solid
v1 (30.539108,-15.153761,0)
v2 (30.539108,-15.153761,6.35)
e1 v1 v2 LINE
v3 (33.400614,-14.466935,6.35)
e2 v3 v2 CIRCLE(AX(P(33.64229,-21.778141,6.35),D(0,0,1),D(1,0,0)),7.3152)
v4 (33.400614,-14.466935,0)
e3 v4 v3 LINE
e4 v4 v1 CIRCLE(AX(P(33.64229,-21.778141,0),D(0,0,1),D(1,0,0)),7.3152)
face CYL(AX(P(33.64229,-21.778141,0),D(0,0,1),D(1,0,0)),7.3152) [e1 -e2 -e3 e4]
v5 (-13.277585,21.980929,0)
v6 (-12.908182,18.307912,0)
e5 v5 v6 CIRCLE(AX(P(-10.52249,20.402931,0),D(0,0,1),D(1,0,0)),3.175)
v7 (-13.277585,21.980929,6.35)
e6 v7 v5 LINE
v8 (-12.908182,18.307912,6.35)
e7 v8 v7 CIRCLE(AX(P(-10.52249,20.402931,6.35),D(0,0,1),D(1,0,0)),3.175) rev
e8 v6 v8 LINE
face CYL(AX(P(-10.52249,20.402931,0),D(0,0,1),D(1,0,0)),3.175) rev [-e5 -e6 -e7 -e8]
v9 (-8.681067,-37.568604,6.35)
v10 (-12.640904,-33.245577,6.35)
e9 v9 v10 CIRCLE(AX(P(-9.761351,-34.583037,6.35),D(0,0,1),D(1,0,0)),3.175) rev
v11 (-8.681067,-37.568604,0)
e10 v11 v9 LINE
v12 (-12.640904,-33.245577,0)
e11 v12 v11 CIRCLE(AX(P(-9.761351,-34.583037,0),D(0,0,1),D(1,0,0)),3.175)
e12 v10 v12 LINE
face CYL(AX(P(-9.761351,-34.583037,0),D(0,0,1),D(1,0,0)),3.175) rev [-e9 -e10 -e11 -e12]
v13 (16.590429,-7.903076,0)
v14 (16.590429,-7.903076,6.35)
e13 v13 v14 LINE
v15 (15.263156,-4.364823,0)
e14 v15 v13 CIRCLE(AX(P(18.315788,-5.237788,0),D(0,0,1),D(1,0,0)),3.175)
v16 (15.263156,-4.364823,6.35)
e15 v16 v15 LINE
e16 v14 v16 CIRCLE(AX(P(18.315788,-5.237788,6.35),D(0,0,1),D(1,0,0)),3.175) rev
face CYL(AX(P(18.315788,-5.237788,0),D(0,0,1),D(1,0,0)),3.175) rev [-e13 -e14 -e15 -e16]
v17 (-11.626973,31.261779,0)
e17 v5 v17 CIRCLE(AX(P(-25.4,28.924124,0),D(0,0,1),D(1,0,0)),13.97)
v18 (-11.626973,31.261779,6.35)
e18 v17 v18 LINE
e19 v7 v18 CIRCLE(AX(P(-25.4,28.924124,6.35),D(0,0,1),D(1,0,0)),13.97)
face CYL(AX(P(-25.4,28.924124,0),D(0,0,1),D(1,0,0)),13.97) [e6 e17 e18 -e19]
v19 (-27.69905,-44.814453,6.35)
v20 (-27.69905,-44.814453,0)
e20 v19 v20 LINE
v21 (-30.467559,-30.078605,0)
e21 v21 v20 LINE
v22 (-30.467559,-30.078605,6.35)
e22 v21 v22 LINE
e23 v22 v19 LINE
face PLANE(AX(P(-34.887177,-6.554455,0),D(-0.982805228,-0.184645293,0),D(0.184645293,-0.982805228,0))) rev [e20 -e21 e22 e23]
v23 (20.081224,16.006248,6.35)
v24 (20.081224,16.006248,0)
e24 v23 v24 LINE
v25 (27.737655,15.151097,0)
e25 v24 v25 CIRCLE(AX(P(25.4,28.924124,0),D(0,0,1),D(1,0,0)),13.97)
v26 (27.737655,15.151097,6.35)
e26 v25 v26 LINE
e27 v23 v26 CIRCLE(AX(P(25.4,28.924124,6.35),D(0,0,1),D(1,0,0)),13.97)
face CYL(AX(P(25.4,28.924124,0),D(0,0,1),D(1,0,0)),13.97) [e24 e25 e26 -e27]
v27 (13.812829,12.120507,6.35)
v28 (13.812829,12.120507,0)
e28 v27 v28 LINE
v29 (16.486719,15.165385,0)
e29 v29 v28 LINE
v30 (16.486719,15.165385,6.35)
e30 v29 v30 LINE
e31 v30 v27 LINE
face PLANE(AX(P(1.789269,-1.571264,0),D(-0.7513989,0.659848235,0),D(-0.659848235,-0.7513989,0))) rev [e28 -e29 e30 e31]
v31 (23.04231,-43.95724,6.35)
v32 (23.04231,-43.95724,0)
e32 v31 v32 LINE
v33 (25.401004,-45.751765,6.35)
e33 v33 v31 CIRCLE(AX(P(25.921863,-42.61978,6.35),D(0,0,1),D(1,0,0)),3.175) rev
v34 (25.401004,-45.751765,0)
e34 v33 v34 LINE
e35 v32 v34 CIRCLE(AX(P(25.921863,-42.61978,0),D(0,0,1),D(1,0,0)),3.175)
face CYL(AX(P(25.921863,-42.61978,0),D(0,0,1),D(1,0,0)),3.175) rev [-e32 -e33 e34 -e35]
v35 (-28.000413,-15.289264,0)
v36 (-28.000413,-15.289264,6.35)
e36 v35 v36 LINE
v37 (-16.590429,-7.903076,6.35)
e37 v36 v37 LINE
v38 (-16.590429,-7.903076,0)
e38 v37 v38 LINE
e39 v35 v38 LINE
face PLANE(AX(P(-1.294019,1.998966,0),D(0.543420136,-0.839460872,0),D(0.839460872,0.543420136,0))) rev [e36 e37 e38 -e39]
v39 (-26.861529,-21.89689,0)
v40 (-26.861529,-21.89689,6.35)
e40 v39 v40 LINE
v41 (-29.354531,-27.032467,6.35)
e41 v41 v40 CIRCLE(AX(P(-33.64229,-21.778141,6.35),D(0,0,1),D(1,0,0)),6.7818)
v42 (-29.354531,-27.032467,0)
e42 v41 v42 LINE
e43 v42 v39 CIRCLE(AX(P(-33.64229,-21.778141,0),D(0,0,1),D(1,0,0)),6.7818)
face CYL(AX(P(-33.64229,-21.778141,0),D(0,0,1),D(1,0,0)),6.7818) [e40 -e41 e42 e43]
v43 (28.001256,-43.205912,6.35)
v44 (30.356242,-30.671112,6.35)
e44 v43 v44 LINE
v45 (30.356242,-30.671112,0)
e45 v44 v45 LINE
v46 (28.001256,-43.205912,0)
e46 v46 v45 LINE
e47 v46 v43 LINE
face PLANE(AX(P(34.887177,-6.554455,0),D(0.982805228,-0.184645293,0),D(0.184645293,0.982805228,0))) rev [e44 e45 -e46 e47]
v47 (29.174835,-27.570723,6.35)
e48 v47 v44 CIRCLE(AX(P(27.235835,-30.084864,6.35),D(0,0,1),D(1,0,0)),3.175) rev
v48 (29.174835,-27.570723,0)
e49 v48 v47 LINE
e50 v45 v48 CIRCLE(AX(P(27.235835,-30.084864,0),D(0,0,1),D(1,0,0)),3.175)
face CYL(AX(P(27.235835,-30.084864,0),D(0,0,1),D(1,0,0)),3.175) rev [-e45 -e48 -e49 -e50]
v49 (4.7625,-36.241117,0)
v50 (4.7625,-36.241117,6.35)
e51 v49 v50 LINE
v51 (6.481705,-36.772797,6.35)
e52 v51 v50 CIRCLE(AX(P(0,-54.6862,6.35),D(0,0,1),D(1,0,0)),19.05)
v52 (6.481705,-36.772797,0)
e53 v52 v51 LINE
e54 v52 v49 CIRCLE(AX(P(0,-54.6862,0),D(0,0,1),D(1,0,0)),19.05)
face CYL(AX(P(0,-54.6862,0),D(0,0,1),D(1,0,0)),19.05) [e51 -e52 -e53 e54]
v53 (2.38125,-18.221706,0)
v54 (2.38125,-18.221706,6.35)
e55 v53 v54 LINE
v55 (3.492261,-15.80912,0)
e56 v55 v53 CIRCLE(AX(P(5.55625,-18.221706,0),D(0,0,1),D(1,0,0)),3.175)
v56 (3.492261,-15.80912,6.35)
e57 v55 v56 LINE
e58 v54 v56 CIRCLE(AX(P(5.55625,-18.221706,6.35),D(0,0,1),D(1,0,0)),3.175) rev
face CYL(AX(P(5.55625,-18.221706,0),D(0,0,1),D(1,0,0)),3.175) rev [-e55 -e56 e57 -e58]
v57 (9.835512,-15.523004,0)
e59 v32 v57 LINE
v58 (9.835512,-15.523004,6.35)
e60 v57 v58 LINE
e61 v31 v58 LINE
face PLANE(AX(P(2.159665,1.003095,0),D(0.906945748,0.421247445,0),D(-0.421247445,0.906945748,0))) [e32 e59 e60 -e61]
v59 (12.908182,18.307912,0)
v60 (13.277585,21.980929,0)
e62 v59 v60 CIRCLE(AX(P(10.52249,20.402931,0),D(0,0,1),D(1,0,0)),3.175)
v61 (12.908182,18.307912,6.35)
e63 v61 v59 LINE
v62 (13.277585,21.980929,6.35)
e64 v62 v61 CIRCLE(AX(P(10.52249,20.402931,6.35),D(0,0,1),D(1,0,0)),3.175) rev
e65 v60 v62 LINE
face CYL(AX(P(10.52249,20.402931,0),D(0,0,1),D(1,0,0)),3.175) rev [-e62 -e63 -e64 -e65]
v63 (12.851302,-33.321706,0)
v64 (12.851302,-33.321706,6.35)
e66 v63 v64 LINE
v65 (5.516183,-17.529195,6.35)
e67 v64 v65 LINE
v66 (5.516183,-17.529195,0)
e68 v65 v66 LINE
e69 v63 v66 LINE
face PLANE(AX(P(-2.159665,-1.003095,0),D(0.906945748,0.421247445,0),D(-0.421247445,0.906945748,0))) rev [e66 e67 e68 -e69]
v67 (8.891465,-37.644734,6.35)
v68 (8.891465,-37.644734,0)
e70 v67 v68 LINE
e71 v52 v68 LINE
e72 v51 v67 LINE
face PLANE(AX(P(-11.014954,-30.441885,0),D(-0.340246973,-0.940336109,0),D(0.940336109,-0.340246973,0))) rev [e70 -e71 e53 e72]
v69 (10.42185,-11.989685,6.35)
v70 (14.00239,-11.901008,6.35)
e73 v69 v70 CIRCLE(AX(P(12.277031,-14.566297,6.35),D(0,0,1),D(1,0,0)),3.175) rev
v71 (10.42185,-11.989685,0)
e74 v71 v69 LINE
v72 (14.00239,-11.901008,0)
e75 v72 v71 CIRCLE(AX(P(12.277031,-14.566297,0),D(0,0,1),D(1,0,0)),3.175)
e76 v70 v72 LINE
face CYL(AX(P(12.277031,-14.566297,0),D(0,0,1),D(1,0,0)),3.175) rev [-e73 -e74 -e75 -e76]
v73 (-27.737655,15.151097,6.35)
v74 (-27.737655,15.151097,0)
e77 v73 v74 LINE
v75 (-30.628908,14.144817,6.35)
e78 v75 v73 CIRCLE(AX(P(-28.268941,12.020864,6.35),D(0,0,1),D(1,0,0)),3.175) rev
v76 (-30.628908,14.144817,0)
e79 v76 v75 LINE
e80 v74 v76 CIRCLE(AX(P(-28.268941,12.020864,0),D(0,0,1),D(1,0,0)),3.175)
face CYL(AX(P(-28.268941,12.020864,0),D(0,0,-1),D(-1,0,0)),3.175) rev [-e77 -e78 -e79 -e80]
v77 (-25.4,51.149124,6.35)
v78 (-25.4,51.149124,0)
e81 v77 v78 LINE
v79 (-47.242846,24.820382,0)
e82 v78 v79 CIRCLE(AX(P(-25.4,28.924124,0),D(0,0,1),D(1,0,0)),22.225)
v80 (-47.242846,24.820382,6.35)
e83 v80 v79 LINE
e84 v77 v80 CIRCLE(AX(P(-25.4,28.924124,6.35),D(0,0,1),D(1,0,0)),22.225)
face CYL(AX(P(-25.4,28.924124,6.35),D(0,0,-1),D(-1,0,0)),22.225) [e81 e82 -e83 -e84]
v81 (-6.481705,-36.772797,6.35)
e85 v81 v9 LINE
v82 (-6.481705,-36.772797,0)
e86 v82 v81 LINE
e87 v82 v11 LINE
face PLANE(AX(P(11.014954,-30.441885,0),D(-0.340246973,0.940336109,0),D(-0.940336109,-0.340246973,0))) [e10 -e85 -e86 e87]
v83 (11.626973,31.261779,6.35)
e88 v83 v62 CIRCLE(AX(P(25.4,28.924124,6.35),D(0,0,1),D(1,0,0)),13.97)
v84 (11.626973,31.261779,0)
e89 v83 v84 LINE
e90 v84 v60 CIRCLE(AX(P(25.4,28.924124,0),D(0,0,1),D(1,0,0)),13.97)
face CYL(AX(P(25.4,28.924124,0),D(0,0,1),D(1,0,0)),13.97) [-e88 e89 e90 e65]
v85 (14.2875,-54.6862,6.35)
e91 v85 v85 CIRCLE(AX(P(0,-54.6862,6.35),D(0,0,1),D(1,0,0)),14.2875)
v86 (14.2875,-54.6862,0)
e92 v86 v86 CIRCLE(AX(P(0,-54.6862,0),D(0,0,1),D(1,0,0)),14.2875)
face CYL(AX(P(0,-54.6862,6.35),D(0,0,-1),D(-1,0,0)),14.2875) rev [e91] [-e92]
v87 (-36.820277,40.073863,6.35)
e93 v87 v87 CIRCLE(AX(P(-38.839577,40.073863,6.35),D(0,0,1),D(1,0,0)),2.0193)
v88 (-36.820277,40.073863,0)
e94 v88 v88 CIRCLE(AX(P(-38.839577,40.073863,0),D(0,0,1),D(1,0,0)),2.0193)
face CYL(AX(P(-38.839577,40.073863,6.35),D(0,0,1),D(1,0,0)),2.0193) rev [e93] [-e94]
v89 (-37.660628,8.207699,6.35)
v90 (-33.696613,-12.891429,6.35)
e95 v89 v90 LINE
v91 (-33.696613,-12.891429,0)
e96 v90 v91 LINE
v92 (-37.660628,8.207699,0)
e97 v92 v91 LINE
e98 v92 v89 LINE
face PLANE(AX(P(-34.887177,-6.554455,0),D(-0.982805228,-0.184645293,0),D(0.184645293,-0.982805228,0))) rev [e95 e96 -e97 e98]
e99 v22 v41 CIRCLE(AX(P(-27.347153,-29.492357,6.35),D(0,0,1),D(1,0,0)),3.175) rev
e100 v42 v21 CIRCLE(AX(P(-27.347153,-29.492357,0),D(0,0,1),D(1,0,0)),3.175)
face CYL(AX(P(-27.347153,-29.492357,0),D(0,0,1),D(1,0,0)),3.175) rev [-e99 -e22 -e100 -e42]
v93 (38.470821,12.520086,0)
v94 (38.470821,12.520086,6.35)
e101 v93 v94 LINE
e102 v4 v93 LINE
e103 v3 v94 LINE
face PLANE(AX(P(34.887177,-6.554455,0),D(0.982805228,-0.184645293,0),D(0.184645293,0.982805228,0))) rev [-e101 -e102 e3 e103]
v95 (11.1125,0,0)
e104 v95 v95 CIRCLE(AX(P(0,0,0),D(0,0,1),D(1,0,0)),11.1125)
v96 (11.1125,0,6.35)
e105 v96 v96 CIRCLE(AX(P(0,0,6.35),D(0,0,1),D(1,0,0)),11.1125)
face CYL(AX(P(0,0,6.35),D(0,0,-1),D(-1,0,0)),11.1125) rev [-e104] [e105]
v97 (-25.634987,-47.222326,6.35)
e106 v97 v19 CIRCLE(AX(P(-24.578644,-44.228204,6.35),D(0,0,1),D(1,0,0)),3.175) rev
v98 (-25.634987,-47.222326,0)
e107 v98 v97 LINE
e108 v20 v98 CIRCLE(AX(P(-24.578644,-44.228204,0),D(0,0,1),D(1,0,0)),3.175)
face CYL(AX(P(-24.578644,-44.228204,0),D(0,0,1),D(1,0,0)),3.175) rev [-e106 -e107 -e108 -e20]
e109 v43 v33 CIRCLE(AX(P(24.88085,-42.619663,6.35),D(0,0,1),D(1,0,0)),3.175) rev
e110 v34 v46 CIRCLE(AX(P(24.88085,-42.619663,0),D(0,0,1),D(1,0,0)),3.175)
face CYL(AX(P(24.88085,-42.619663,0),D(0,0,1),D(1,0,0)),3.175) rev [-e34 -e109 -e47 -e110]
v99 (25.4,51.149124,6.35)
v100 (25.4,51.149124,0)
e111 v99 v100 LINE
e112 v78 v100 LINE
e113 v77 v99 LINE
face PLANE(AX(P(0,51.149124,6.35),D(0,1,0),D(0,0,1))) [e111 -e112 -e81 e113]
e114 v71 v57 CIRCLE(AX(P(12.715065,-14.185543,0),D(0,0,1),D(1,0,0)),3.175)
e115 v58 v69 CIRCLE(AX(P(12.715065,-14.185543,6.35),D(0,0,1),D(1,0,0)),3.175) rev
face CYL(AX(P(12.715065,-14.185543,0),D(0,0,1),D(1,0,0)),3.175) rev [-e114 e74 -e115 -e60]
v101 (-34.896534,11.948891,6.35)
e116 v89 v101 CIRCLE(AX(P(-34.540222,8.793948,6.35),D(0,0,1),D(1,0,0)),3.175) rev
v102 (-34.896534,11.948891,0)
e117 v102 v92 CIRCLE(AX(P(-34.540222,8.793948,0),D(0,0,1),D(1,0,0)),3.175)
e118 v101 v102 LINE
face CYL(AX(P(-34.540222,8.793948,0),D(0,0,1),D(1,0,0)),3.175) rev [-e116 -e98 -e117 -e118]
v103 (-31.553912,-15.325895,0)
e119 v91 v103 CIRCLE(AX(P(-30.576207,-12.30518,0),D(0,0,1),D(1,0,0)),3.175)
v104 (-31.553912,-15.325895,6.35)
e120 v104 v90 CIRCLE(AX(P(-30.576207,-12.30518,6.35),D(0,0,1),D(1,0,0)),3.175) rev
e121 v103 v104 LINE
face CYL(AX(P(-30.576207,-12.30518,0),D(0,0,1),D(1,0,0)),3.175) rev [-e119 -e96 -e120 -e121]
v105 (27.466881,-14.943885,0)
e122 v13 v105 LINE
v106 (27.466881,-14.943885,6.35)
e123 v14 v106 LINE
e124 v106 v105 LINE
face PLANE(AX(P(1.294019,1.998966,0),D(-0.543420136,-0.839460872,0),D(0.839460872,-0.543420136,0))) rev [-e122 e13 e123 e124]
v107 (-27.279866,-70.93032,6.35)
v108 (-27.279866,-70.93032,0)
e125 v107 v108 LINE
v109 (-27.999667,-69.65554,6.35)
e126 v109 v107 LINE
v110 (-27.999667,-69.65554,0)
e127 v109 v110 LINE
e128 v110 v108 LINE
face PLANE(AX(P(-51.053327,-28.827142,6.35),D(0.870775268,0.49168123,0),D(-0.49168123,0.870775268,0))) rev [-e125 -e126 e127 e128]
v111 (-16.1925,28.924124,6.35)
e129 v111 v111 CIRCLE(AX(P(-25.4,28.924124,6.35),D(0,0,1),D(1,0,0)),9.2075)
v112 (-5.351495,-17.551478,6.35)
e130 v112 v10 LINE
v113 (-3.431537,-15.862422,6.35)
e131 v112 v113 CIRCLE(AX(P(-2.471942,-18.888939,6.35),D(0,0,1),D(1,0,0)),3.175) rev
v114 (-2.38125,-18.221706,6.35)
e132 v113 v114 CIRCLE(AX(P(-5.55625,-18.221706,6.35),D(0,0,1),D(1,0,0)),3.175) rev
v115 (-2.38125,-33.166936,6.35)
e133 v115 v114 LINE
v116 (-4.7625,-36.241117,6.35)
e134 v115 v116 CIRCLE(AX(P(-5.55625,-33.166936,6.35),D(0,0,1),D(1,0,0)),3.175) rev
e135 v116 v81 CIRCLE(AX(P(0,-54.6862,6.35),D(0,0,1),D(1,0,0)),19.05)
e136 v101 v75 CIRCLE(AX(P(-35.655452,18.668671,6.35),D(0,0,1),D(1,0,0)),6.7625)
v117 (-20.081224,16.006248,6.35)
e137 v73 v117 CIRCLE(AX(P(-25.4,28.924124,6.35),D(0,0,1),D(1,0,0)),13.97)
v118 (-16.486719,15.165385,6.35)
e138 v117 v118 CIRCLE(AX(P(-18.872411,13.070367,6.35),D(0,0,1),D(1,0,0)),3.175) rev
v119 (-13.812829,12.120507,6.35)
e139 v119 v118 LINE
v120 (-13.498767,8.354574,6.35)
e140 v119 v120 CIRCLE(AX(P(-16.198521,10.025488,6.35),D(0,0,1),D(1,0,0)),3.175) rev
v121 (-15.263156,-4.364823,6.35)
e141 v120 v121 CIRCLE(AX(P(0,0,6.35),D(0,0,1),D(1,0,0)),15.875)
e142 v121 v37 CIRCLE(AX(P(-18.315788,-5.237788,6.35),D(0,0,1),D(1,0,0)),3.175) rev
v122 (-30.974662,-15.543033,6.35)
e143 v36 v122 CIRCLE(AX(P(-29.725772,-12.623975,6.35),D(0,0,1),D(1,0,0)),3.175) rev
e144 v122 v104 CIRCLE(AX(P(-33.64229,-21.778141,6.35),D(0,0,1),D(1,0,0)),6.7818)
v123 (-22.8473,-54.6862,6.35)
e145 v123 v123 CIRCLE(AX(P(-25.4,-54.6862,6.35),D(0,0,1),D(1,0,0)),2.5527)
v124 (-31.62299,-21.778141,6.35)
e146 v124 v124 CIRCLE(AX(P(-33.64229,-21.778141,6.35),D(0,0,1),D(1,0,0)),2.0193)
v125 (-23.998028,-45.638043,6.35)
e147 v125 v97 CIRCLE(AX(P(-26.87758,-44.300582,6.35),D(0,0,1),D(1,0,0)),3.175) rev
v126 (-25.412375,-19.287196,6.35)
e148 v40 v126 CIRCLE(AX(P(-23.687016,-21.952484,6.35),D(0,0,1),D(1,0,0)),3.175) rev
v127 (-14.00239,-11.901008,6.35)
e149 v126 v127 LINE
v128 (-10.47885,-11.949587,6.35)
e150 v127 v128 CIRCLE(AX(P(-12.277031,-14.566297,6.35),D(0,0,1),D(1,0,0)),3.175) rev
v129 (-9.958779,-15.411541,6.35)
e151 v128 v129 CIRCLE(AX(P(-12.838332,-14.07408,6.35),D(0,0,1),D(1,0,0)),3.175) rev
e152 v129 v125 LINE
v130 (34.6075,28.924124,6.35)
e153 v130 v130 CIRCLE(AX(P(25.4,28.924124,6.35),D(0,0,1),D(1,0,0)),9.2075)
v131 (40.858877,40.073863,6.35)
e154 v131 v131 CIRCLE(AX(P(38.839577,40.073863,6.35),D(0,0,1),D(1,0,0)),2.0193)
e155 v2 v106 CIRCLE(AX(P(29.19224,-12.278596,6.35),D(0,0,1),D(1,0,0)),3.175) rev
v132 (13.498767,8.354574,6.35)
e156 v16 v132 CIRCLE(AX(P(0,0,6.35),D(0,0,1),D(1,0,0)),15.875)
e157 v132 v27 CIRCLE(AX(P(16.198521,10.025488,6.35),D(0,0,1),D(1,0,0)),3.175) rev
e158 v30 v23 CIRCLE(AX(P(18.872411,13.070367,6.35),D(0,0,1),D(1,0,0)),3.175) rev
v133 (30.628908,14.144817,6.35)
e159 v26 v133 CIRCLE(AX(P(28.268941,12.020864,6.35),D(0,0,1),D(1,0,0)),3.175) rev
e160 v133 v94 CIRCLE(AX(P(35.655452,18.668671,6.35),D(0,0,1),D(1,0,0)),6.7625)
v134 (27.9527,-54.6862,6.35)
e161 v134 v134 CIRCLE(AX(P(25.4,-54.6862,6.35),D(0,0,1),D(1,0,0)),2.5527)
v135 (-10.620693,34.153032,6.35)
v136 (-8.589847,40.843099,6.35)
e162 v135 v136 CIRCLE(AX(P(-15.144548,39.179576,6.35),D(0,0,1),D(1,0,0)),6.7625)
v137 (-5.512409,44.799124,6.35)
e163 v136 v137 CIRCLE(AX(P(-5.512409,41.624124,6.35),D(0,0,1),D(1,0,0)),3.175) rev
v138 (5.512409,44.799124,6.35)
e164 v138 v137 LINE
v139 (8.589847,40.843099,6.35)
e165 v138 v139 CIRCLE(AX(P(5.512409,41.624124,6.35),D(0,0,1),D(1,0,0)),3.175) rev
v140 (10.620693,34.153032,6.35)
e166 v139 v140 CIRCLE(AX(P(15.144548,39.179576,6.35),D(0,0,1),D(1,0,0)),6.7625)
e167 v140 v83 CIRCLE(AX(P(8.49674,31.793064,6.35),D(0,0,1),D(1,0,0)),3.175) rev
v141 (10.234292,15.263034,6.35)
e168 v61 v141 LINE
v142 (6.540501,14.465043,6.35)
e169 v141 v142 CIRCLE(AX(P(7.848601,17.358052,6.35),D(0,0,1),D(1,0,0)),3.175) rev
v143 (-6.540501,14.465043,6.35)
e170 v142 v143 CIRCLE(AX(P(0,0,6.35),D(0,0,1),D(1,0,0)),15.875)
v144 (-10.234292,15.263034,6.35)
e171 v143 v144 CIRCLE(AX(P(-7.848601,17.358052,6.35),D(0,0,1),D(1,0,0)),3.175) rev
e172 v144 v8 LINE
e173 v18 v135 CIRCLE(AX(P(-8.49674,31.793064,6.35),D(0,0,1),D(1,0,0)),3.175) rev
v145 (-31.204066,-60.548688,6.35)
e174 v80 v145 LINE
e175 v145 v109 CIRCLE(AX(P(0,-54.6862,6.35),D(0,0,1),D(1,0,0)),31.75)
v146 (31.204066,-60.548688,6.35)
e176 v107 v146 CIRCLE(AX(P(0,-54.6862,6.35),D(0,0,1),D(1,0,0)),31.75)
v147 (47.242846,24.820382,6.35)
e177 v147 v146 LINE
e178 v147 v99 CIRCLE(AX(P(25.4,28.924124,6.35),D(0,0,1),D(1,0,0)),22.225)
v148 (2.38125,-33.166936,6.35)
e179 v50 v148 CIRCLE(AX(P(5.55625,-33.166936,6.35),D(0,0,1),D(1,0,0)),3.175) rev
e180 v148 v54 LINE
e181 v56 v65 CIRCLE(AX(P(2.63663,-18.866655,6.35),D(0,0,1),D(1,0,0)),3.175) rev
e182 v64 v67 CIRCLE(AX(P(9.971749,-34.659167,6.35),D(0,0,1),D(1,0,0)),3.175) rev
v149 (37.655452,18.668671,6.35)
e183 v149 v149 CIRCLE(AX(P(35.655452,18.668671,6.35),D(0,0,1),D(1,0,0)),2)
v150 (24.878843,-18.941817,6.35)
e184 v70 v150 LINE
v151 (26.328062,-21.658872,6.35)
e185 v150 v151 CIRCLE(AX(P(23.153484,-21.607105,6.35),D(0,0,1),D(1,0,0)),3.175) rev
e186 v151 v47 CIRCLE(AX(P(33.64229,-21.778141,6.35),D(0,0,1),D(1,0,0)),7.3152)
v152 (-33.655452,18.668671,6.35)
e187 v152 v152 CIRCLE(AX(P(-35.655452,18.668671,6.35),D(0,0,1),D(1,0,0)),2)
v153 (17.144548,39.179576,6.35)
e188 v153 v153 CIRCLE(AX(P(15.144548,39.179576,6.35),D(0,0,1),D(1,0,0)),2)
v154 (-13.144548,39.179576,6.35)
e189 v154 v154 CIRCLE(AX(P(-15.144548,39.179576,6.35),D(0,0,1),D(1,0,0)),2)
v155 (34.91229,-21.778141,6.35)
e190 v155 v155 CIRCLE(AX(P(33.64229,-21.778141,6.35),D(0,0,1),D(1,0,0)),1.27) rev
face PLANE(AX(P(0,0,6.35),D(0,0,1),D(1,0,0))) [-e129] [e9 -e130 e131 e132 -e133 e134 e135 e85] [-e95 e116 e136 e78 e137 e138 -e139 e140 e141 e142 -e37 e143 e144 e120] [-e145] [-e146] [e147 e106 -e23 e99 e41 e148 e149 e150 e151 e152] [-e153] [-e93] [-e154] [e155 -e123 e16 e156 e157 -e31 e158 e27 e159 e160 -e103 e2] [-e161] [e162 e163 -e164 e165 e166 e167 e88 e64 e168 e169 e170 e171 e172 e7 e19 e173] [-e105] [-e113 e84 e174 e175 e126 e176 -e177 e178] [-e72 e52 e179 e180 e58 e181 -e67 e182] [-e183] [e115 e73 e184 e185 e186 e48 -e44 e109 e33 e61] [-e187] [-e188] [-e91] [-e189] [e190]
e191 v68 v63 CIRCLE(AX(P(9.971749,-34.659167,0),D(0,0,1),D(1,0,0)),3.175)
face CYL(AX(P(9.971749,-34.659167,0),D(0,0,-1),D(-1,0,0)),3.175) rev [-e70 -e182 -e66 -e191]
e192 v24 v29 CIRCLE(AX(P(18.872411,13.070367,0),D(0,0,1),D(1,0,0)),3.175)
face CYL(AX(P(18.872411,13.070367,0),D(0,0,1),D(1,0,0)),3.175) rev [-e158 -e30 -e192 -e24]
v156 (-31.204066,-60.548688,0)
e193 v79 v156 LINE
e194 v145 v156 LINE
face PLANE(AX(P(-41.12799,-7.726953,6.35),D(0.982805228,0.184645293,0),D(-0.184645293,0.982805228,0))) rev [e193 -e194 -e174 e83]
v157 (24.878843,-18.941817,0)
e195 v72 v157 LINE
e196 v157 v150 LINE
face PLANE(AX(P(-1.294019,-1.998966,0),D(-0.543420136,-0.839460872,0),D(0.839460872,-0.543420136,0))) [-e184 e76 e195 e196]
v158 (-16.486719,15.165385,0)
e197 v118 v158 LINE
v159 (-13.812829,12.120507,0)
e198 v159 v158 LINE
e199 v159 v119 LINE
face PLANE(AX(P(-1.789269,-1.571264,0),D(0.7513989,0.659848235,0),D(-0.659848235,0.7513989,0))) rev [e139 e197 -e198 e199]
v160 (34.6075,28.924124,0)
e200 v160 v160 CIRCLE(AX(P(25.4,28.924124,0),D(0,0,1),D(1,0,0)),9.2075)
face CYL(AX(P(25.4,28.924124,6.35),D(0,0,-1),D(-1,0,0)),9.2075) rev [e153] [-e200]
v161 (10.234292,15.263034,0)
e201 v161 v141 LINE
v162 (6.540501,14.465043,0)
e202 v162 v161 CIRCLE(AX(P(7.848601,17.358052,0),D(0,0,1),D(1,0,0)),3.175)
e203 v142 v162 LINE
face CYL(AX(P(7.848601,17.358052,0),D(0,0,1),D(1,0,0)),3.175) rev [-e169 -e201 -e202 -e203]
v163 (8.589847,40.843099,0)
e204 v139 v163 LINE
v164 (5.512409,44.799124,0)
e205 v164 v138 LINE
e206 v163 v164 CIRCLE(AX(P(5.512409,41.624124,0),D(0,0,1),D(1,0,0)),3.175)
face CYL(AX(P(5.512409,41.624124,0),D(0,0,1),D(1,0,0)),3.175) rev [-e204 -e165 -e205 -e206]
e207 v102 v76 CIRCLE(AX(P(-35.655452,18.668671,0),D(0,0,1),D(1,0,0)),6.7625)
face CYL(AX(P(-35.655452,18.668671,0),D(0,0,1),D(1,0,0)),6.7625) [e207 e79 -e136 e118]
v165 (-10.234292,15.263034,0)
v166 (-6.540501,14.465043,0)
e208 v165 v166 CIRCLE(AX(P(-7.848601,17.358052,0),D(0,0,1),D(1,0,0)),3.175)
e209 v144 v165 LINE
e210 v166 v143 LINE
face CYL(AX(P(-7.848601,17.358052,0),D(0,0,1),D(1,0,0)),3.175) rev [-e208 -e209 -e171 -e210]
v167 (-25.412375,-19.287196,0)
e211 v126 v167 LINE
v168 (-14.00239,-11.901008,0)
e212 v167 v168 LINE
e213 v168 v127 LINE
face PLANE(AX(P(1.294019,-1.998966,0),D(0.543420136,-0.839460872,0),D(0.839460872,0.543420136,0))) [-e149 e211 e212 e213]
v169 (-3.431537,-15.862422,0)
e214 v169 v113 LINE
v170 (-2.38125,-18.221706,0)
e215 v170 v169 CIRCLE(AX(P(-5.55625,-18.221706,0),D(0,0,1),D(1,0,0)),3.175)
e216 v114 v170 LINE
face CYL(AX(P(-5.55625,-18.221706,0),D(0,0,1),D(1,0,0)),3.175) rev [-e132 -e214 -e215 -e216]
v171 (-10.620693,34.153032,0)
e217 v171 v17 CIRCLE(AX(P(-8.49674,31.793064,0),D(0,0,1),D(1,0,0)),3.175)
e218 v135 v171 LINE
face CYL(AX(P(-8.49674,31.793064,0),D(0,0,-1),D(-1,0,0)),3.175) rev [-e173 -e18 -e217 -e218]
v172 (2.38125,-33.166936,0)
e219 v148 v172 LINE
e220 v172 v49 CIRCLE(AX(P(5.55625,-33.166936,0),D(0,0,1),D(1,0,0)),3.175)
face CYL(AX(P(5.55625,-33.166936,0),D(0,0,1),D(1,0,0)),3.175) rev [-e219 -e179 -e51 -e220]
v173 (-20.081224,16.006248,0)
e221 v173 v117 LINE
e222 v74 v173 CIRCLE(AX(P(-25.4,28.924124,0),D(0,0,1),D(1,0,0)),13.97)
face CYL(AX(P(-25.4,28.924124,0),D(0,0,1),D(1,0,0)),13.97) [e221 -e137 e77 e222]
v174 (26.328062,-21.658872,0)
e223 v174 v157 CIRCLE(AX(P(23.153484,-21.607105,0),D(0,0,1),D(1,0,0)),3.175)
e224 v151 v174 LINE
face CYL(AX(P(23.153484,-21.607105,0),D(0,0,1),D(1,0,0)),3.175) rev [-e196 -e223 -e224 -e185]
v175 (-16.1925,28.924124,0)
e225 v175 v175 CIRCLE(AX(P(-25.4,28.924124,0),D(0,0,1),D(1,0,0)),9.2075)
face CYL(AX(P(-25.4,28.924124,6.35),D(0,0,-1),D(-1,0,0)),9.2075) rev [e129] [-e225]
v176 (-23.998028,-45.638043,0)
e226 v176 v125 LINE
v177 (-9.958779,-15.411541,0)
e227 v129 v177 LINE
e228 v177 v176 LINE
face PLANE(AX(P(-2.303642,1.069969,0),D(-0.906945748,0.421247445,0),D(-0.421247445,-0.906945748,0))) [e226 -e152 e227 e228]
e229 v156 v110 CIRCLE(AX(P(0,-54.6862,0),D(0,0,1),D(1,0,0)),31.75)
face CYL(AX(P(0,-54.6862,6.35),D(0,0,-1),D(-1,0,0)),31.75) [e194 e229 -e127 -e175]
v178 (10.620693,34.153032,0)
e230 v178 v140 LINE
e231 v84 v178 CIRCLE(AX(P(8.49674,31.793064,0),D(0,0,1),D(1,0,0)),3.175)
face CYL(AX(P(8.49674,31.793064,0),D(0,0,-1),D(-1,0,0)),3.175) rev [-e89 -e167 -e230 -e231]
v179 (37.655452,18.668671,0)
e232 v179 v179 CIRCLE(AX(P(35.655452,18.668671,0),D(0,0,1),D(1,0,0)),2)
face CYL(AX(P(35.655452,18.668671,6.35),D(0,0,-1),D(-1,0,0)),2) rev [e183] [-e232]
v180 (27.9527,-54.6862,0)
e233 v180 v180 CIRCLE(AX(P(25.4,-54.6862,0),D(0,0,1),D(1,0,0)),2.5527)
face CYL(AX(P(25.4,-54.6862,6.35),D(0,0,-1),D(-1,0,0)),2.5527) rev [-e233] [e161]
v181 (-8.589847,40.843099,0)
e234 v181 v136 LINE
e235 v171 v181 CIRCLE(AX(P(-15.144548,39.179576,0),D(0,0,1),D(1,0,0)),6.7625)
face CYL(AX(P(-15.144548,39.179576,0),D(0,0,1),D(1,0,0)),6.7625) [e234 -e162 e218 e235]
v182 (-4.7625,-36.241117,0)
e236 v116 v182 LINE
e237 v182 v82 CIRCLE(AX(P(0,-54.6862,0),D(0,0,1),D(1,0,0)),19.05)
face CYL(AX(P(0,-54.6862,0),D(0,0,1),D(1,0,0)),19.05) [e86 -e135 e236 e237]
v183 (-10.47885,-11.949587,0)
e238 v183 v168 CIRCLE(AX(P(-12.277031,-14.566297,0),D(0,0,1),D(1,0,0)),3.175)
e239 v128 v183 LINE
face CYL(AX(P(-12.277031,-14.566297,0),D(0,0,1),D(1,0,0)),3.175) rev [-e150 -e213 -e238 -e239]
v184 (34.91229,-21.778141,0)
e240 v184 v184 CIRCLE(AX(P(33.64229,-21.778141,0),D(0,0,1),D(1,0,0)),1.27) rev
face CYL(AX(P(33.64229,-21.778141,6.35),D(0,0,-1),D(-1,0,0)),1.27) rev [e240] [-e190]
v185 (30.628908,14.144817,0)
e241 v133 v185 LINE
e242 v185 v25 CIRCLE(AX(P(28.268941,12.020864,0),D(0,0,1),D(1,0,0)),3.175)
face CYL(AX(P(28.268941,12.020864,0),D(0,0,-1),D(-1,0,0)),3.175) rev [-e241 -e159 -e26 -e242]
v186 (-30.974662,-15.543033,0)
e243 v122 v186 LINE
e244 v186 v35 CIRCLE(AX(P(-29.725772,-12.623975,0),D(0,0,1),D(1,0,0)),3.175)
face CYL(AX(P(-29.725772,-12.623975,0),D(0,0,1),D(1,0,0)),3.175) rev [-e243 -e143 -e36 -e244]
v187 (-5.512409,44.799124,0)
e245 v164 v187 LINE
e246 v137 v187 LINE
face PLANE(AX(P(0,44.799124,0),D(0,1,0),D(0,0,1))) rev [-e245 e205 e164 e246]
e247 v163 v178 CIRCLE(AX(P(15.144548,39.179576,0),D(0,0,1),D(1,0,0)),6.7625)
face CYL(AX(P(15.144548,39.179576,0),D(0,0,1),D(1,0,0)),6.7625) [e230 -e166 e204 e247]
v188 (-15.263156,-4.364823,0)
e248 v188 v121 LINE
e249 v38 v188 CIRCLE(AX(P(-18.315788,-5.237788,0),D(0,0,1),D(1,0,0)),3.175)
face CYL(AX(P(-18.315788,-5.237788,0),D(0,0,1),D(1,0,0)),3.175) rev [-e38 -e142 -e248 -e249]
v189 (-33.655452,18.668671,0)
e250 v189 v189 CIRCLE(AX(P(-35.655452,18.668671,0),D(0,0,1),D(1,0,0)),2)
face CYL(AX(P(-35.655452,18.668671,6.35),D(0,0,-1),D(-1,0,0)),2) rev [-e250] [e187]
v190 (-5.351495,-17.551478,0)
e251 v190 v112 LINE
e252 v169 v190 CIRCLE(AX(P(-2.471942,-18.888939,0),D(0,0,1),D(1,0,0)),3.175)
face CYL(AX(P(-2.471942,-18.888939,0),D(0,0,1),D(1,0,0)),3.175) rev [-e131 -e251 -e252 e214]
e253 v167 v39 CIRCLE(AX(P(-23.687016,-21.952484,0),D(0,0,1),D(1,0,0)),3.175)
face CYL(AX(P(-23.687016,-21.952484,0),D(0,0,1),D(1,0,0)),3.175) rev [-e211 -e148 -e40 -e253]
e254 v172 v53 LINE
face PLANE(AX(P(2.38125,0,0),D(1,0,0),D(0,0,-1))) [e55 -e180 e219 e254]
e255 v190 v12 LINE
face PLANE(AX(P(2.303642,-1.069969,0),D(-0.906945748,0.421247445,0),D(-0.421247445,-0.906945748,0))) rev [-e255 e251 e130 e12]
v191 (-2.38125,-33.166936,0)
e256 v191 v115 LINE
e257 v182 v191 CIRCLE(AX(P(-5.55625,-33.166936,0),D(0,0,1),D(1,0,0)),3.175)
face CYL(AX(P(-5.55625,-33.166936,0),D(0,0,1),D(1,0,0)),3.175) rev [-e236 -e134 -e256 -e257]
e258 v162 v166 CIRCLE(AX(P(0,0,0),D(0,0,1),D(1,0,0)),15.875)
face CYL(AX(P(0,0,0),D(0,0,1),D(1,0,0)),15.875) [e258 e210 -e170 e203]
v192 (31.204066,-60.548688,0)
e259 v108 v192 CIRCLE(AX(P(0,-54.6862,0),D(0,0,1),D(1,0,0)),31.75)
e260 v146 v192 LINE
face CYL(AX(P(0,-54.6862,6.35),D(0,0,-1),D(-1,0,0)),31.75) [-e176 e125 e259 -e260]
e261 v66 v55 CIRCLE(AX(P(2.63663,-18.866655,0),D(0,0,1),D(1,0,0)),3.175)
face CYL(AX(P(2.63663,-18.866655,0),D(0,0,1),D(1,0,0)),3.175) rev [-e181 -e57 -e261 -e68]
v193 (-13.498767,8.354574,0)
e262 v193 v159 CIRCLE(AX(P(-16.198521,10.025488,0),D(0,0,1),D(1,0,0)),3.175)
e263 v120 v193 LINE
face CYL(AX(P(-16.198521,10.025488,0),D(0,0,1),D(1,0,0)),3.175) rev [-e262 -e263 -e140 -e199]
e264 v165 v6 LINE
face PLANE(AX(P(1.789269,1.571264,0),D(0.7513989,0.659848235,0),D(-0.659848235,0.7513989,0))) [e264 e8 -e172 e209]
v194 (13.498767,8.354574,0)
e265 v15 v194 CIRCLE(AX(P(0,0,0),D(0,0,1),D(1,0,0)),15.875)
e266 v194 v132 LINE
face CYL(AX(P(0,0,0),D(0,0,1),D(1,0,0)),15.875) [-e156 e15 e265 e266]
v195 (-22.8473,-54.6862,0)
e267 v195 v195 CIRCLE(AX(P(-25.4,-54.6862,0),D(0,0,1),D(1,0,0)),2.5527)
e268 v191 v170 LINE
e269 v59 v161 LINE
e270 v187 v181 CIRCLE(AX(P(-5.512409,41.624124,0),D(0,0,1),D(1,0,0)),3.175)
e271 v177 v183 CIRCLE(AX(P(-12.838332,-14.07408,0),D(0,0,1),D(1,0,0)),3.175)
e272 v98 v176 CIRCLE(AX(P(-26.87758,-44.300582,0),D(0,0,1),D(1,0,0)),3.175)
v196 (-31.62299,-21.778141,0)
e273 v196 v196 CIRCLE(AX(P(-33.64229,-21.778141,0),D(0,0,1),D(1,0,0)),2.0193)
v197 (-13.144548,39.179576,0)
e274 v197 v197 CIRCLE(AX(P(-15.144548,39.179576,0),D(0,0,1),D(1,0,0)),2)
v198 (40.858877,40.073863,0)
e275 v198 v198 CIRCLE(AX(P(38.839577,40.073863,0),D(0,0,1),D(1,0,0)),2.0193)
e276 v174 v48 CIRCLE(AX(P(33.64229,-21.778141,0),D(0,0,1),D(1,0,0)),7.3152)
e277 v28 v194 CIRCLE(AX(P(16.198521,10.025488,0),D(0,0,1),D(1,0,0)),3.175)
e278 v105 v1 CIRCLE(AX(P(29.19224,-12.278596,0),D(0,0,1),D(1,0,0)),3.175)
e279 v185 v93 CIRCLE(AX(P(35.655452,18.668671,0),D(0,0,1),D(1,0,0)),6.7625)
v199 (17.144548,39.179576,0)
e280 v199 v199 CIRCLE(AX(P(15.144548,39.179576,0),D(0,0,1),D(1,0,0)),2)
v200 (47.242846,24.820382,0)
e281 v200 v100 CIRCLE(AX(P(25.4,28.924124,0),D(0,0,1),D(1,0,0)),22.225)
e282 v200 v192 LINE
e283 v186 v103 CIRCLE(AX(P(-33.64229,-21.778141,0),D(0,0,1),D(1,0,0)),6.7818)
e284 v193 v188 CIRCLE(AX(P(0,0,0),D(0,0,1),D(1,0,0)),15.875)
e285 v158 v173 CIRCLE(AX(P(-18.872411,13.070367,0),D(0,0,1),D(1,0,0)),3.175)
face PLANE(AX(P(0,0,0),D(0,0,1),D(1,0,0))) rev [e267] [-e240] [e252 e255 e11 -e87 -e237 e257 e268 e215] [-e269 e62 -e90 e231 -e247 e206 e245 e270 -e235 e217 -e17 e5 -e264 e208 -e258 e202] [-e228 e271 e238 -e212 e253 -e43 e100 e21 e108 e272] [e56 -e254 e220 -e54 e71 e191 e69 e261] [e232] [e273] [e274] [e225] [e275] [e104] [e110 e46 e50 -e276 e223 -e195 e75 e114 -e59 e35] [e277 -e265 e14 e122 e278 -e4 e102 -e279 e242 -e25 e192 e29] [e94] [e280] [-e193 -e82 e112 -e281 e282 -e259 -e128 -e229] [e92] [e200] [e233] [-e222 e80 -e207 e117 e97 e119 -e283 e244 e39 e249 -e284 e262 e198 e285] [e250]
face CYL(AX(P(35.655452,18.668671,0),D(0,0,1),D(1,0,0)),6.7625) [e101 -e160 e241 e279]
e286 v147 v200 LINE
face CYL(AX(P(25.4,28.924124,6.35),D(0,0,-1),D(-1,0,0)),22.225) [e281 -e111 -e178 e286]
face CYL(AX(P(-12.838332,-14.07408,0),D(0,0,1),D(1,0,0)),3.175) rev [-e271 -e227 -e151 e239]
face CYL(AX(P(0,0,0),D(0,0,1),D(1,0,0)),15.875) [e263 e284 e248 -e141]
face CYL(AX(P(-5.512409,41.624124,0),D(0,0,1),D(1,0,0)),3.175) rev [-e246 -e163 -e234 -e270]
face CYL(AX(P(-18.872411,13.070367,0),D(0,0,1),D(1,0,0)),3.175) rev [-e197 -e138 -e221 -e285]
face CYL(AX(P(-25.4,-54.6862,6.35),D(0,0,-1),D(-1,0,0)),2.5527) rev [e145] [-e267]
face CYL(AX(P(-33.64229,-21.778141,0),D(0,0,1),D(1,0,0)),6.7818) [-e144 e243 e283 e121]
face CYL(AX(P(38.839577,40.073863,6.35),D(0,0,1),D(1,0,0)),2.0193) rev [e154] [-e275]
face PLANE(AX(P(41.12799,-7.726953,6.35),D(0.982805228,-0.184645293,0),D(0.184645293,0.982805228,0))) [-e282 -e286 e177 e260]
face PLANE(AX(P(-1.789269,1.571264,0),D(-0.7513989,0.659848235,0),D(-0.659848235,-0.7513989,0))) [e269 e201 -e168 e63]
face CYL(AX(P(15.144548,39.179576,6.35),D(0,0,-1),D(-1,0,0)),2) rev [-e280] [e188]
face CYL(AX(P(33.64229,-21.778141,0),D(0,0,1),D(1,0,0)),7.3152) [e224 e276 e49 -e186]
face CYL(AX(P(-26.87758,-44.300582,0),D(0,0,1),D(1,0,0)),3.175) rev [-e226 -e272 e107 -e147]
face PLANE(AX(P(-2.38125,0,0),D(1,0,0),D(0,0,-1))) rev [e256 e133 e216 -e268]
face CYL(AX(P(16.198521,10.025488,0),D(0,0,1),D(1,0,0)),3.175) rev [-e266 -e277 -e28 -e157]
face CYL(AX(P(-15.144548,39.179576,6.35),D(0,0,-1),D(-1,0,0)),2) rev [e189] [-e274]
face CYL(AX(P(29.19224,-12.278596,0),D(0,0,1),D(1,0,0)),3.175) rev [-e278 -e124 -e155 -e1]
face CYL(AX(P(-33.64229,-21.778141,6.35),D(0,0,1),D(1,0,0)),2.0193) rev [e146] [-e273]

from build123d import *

# Parameters (mm, degrees)
SKETCH1_R                  = 2
SKETCH1_R_2                = 9.2075
SKETCH1_R_3                = 11.1125
SKETCH1_R_4                = 14.2875
SKETCH1_R_5                = 2.5527
SKETCH1_R_6                = 1.27
BOSS_EXTRUDE1_DEPTH        = 6.35
F_10_32_TAPPED_HOLE1_D     = 4.0386
F_10_32_TAPPED_HOLE1_DEPTH = 12.02944
F_10_32_TAPPED_HOLE1_TIP   = 1.213317848
CUT_EXTRUDE2_DEPTH         = 99.892263577
FILLET2_R                  = 3.175


with BuildPart() as part:
    # Sketch1 → Boss-Extrude1 (new body)
    with BuildSketch(Plane.XY):
        with BuildLine():
            Line((-25.4, 51.149123836), (25.4, 51.149123836))
            ThreePointArc((25.4, 51.149123836), (42.504915713, 43.114701113), (47.242846186, 24.820382188))
            Line((47.242846186, 24.820382188), (31.204065979, -60.548688068))
            ThreePointArc((31.204065979, -60.548688068), (5.549270776, -85.947487463), (-27.279865705, -70.930319771))
            Line((-27.279865705, -70.930319771), (-27.999667191, -69.655539905))
            ThreePointArc((-27.999667191, -69.655539905), (-29.950028263, -65.224620521), (-31.204065979, -60.548688068))
            Line((-31.204065979, -60.548688068), (-47.242846186, 24.820382188))
            ThreePointArc((-47.242846186, 24.820382188), (-42.504915713, 43.114701113), (-25.4, 51.149123836))
        make_face()
        with Locations((-15.14454751, 39.179576326)):
            Circle(SKETCH1_R, mode=Mode.SUBTRACT)
        with Locations((-35.65545249, 18.668671346)):
            Circle(SKETCH1_R, mode=Mode.SUBTRACT)
        with Locations((15.14454751, 39.179576326)):
            Circle(SKETCH1_R, mode=Mode.SUBTRACT)
        with Locations((35.65545249, 18.668671346)):
            Circle(SKETCH1_R, mode=Mode.SUBTRACT)
        with Locations((25.4, 28.924123836)):
            Circle(SKETCH1_R_2, mode=Mode.SUBTRACT)
        with Locations((-25.4, 28.924123836)):
            Circle(SKETCH1_R_2, mode=Mode.SUBTRACT)
        Circle(SKETCH1_R_3, mode=Mode.SUBTRACT)
        with Locations((0, -54.6862)):
            Circle(SKETCH1_R_4, mode=Mode.SUBTRACT)
        with Locations((25.4, -54.6862)):
            Circle(SKETCH1_R_5, mode=Mode.SUBTRACT)
        with Locations((-25.4, -54.6862)):
            Circle(SKETCH1_R_5, mode=Mode.SUBTRACT)
        with Locations((38.839576632, 40.073863125)):
            Circle(SKETCH1_R_6, mode=Mode.SUBTRACT)
        with Locations((-38.839576632, 40.073863125)):
            Circle(SKETCH1_R_6, mode=Mode.SUBTRACT)
        with Locations((-33.642289639, -21.778141451)):
            Circle(SKETCH1_R_6, mode=Mode.SUBTRACT)
        with Locations((33.642289639, -21.778141451)):
            Circle(SKETCH1_R_6, mode=Mode.SUBTRACT)
    extrude(amount=BOSS_EXTRUDE1_DEPTH)

    # #10-32 Tapped Hole1
    with Locations(Plane(origin=(-38.839576632, 40.073863125, 6.35), x_dir=(1, 0, 0), z_dir=(0, 0, 1))):
        with Locations((0, 0), (77.679153264, 0), (5.197286993, -61.852004576)):
            Hole(F_10_32_TAPPED_HOLE1_D / 2, depth=F_10_32_TAPPED_HOLE1_DEPTH)
            with Locations((0, 0, -(F_10_32_TAPPED_HOLE1_DEPTH + F_10_32_TAPPED_HOLE1_TIP / 2))):  # 118° drill point
                Cone(0, F_10_32_TAPPED_HOLE1_D / 2, F_10_32_TAPPED_HOLE1_TIP, mode=Mode.SUBTRACT)

    # Sketch5 → Cut-Extrude2 (cut, through all)
    with BuildSketch(Plane.XY.offset(6.35)):
        with BuildLine():
            Line((-24.813855531, -47.39452079), (-8.904792953, -13.142309061))
            ThreePointArc((-8.904792953, -13.142309061), (-10.475087885, -11.928460035), (-11.881646743, -10.528157278))
            Line((-11.881646743, -10.528157278), (-27.017696568, -20.326391513))
            ThreePointArc((-27.017696568, -20.326391513), (-27.585254368, -24.828573381), (-30.864649823, -27.965025019))
            Line((-30.864649823, -27.965025019), (-27.177545182, -47.590251567))
            ThreePointArc((-27.177545182, -47.590251567), (-26.003685803, -47.395952097), (-24.813855531, -47.39452079))
        make_face()
        with BuildLine():
            ThreePointArc((-14.469685141, -6.530224875), (-15.724434186, 2.181236924), (-12.145844148, 10.222235319))
            Line((-12.145844148, 10.222235319), (-18.106090407, 17.009436142))
            ThreePointArc((-18.106090407, 17.009436142), (-23.713214285, 15.056331872), (-29.62504423, 15.608347432))
            ThreePointArc((-29.62504423, 15.608347432), (-33.426448335, 12.284084693), (-38.470821379, 12.520085796))
            Line((-38.470821379, 12.520085796), (-33.299522858, -15.005009075))
            ThreePointArc((-33.299522858, -15.005009075), (-31.354825082, -15.393760734), (-29.605734966, -16.32845911))
            Line((-29.605734966, -16.32845911), (-14.469685141, -6.530224875))
        make_face()
        with BuildLine():
            ThreePointArc((-2.38125, -15.695390197), (-3.345762389, -15.518424502), (-4.297508552, -15.28224608))
            Line((-4.297508552, -15.28224608), (-15.854365092, -40.164158211))
            Line((-15.854365092, -40.164158211), (-6.48170484, -36.77279713))
            ThreePointArc((-6.48170484, -36.77279713), (-4.458881555, -36.165377252), (-2.38125, -35.785614072))
            Line((-2.38125, -35.785614072), (-2.38125, -15.695390197))
        make_face()
        with BuildLine():
            Line((-14.527553146, 20.151963361), (-8.567306887, 13.364762538))
            ThreePointArc((-8.567306887, 13.364762538), (0, 15.875), (8.567306887, 13.364762538))
            Line((8.567306887, 13.364762538), (14.527553146, 20.151963361))
            ThreePointArc((14.527553146, 20.151963361), (11.670492775, 26.343129578), (12.084223595, 33.149168066))
            ThreePointArc((12.084223595, 33.149168066), (8.394277662, 38.773050516), (11.382620871, 44.799123836))
            Line((11.382620871, 44.799123836), (-11.382620871, 44.799123836))
            ThreePointArc((-11.382620871, 44.799123836), (-8.394277662, 38.773050516), (-12.084223595, 33.149168066))
            ThreePointArc((-12.084223595, 33.149168066), (-11.670492775, 26.343129578), (-14.527553146, 20.151963361))
        make_face()
        with BuildLine():
            ThreePointArc((4.45197845, -15.237962885), (3.424260898, -15.501292278), (2.38125, -15.695390197))
            Line((2.38125, -15.695390197), (2.38125, -35.785614072))
            ThreePointArc((2.38125, -35.785614072), (4.458881555, -36.165377252), (6.48170484, -36.77279713))
            Line((6.48170484, -36.77279713), (16.064762788, -40.240287564))
            Line((16.064762788, -40.240287564), (4.45197845, -15.237962885))
        make_face()
        with BuildLine():
            Line((18.106090407, 17.009436142), (12.145844148, 10.222235319))
            ThreePointArc((12.145844148, 10.222235319), (15.724434186, 2.181236924), (14.469685141, -6.530224875))
            Line((14.469685141, -6.530224875), (29.129945464, -16.020459531))
            ThreePointArc((29.129945464, -16.020459531), (31.14158255, -14.903651281), (33.400613995, -14.466934715))
            Line((33.400613995, -14.466934715), (38.470821379, 12.520085796))
            ThreePointArc((38.470821379, 12.520085796), (33.426448335, 12.284084693), (29.62504423, 15.608347432))
            ThreePointArc((29.62504423, 15.608347432), (23.713214285, 15.056331872), (18.106090407, 17.009436142))
        make_face()
        with BuildLine():
            ThreePointArc((11.881646743, -10.528157278), (10.414581776, -11.981323442), (8.771307576, -13.23177193))
            Line((8.771307576, -13.23177193), (23.946065705, -45.90302618))
            ThreePointArc((23.946065705, -45.90302618), (25.714821926, -45.78906819), (27.471099817, -46.02775829))
            Line((27.471099817, -46.02775829), (30.763558685, -28.503099379))
            ThreePointArc((30.763558685, -28.503099379), (27.09299641, -25.036808239), (26.541907066, -20.018391934))
            Line((26.541907066, -20.018391934), (11.881646743, -10.528157278))
        make_face()
    extrude(amount=-CUT_EXTRUDE2_DEPTH, mode=Mode.SUBTRACT)

    # Fillet2
    # the kernel refuses this fillet: 3.175 mm, written as the material it adds along each edge
    with BuildSketch(Plane(origin=(23.946065705, -45.90302618, 6.35), x_dir=(0.9981756767261354, 0.06037647217519295, 0), z_dir=(0, 0, -1))) as fillet2_piece_1:
        with BuildLine():
            CenterArc((2.170423522, -3.157965013), FILLET2_R, 95.937874905, 62.610178346)
            Line((-0.784627149, -1.996801573), (0, 0))
            ThreePointArc((0, 0), (0.920984799, -0.047766105), (1.841969599, 0))
        make_face()
    extrude(amount=6.35)
    with BuildSketch(Plane(origin=(8.771307576, -13.23177193, 6.35), x_dir=(0.4212474446415146, -0.9069457483129816, 0), z_dir=(0, 0, -1)), Plane(origin=(-11.881646743, -10.528157278, 6.35), x_dir=(-0.8394608720498955, -0.5434201360800212, 0), z_dir=(0, 0, -1)), Plane(origin=(-12.145844148, 10.222235319, 6.35), x_dir=(-0.6598482349060056, 0.7513988999801827, 0), z_dir=(0, 0, -1)), Plane(origin=(14.469685141, -6.530224875, 6.35), x_dir=(0.8394608720498943, -0.5434201360800233, 0), z_dir=(0, 0, -1)), Plane(origin=(8.567306887, 13.364762538, 6.35), x_dir=(0.6598482349059847, 0.7513988999802013, 0), z_dir=(0, 0, -1))) as fillet2_piece_2:
        with BuildLine():
            CenterArc((2.526316253, -3.175), FILLET2_R, 90, 73.0422367)
            ThreePointArc((-0.510634822, -2.248958333), (-0.214424432, -1.133764078), (0, 0))
            Line((0, 0), (2.526316253, 0))
        make_face()
    extrude(amount=6.35)
    with BuildSketch(Plane(origin=(11.881646743, -10.528157278, 6.35), x_dir=(0.8394608720498972, -0.5434201360800189, 0), z_dir=(0, 0, -1)), Plane(origin=(-2.38125, -15.695390197, 6.35), x_dir=(0, -1, 0), z_dir=(0, 0, -1)), Plane(origin=(12.145844148, 10.222235319, 6.35), x_dir=(0.6598482349059996, 0.7513988999801882, 0), z_dir=(0, 0, -1))) as fillet2_piece_3:
        with BuildLine():
            CenterArc((2.526316253, 3.175), FILLET2_R, 196.9577633, 73.0422367)
            ThreePointArc((-0.510634822, 2.248958333), (-0.214424432, 1.133764078), (0, 0))
            Line((0, 0), (2.526316253, 0))
        make_face()
    extrude(amount=6.35)
    with BuildSketch(Plane(origin=(26.541907066, -20.018391934, 6.35), x_dir=(-0.8394608720498852, 0.5434201360800374, 0), z_dir=(0, 0, -1))) as fillet2_piece_4:
        with BuildLine():
            CenterArc((1.981109709, -3.175), FILLET2_R, 90, 58.01744603)
            ThreePointArc((-0.711955175, -1.493326271), (-0.313626631, -0.766854291), (0, 0))
            Line((0, 0), (1.981109709, 0))
        make_face()
    extrude(amount=6.35)
    with BuildSketch(Plane(origin=(-27.177545182, -47.590251567, 6.35), x_dir=(-0.18464529349029274, 0.9828052276986949, 0), z_dir=(0, 0, -1))) as fillet2_piece_5:
        with BuildLine():
            CenterArc((2.824362541, 3.175), FILLET2_R, 195.131164146, 74.868835854)
            ThreePointArc((-0.240562734, 2.346230998), (-0.025101359, 1.182874454), (0, 0))
            Line((0, 0), (2.824362541, 0))
        make_face()
    extrude(amount=6.35)
    with BuildSketch(Plane(origin=(-30.864649823, -27.965025019, 6.35), x_dir=(0.1846452934902994, -0.9828052276986938, 0), z_dir=(0, 0, -1))) as fillet2_piece_6:
        with BuildLine():
            CenterArc((2.150558838, -3.175), FILLET2_R, 90, 61.424503729)
            ThreePointArc((-0.637686848, -1.656345663), (-0.264424358, -0.849123967), (0, 0))
            Line((0, 0), (2.150558838, 0))
        make_face()
    extrude(amount=6.35)
    with BuildSketch(Plane(origin=(-33.299522858, -15.005009075, 6.35), x_dir=(0.9835208172445462, -0.1807949170928764, 0), z_dir=(0, 0, -1))) as fillet2_piece_7:
        with BuildLine():
            CenterArc((2.190322598, -3.147699991), FILLET2_R, 97.518978435, 61.424503729)
            Line((-0.772671445, -2.006958433), (0, 0))
            ThreePointArc((0, 0), (0.887429641, -0.058312819), (1.774859282, 0))
        make_face()
    extrude(amount=6.35)
    with BuildSketch(Plane(origin=(-27.017696568, -20.326391513, 6.35), x_dir=(0.0989499734468529, -0.9950924091534752, 0), z_dir=(0, 0, -1))) as fillet2_piece_8:
        with BuildLine():
            CenterArc((1.947683222, -3.153433004), FILLET2_R, 96.682004109, 56.079937144)
            Line((-0.875249123, -1.700271631), (0, 0))
            ThreePointArc((0, 0), (0.789122034, -0.046067103), (1.578244068, 0))
        make_face()
    extrude(amount=6.35)
    with BuildSketch(Plane(origin=(-2.38125, -35.785614072, 6.35), x_dir=(0, 1, 0), z_dir=(0, 0, -1))) as fillet2_piece_9:
        with BuildLine():
            CenterArc((2.618677789, -3.175), FILLET2_R, 90, 75.522487814)
            ThreePointArc((-0.455502742, -2.38125), (-0.189831312, -1.197878623), (0, 0))
            Line((0, 0), (2.618677789, 0))
        make_face()
    extrude(amount=6.35)
    with BuildSketch(Plane(origin=(-38.470821379, 12.520085796, 6.35), x_dir=(0.18464529349028944, -0.9828052276986956, 0), z_dir=(0, 0, -1))) as fillet2_piece_10:
        with BuildLine():
            CenterArc((4.387834699, -3.175), FILLET2_R, 90, 94.196890108)
            ThreePointArc((1.221348618, -3.407359406), (0.842883833, -1.620445519), (0, 0))
            Line((0, 0), (4.387834699, 0))
        make_face()
    extrude(amount=6.35)
    with BuildSketch(Plane(origin=(-18.106090407, 17.009436142, 6.35), x_dir=(-0.8915887195092606, -0.45284606130984195, 0), z_dir=(0, 0, -1)), Plane(origin=(14.527553146, 20.151963361, 6.35), x_dir=(-0.5642443308564503, 0.8256078579424718, 0), z_dir=(0, 0, -1))) as fillet2_piece_11:
        with BuildLine():
            CenterArc((2.467034449, -3.165004403), FILLET2_R, 94.547619578, 71.09051251)
            Line((-0.608741903, -2.37746086), (0, 0))
            ThreePointArc((0, 0), (1.10764812, -0.043980625), (2.21529624, 0))
        make_face()
    extrude(amount=6.35)
    with BuildSketch(Plane(origin=(-14.469685141, -6.530224875, 6.35), x_dir=(-0.3440599520925635, 0.9389476819110121, 0), z_dir=(0, 0, -1)), Plane(origin=(4.45197845, -15.237962885, 6.35), x_dir=(-0.9777062537991693, -0.20997733516261785, 0), z_dir=(0, 0, -1)), Plane(origin=(-8.567306887, 13.364762538, 6.35), x_dir=(0.8788508020140211, 0.4770967069675831, 0), z_dir=(0, 0, -1))) as fillet2_piece_12:
        with BuildLine():
            CenterArc((2.536820731, -3.166613236), FILLET2_R, 94.165418371, 73.0422367)
            Line((-0.559372422, -2.46361042), (0, 0))
            ThreePointArc((0, 0), (1.153100332, -0.041933821), (2.306200665, 0))
        make_face()
    extrude(amount=6.35)
    with BuildSketch(Plane(origin=(-29.605734966, -16.32845911, 6.35), x_dir=(0.8394608720499046, 0.5434201360800074, 0), z_dir=(0, 0, -1))) as fillet2_piece_13:
        with BuildLine():
            CenterArc((1.912324409, -3.175), FILLET2_R, 90, 56.079937144)
            ThreePointArc((-0.722344352, -1.403236607), (-0.320213336, -0.722702693), (0, 0))
            Line((0, 0), (1.912324409, 0))
        make_face()
    extrude(amount=6.35)
    with BuildSketch(Plane(origin=(18.106090407, 17.009436142, 6.35), x_dir=(-0.6598482349059278, -0.751398899980251, 0), z_dir=(0, 0, -1)), Plane(origin=(-14.527553146, 20.151963361, 6.35), x_dir=(0.6598482349059827, -0.751398899980203, 0), z_dir=(0, 0, -1))) as fillet2_piece_14:
        with BuildLine():
            CenterArc((2.454157054, -3.175), FILLET2_R, 90, 71.09051251)
            ThreePointArc((-0.549493622, -2.146064815), (-0.232140649, -1.083941591), (0, 0))
            Line((0, 0), (2.454157054, 0))
        make_face()
    extrude(amount=6.35)
    with BuildSketch(Plane(origin=(29.62504423, 15.608347432, 6.35), x_dir=(-0.9718852801044001, -0.23545488382361449, 0), z_dir=(0, 0, -1))) as fillet2_piece_15:
        with BuildLine():
            CenterArc((2.162667805, -3.16732145), FILLET2_R, 93.985592978, 57.645860045)
            ThreePointArc((-0.63104498, -1.658747992), (-0.260871655, -0.85016506), (0, 0))
            ThreePointArc((0, 0), (0.970993708, -0.033785621), (1.941987416, 0))
        make_face()
    extrude(amount=6.35)
    with BuildSketch(Plane(origin=(29.129945464, -16.020459531, 6.35), x_dir=(0.8517873831390265, 0.5238876348275167, 0), z_dir=(0, 0, -1))) as fillet2_piece_16:
        with BuildLine():
            CenterArc((2.013377815, -3.154636342), FILLET2_R, 96.492710737, 58.01744603)
            Line((-0.852572722, -1.788271633), (0, 0))
            ThreePointArc((0, 0), (0.827179473, -0.046917867), (1.654358946, 0))
        make_face()
    extrude(amount=6.35)
    with BuildSketch(Plane(origin=(2.38125, -35.785614072, 6.35), x_dir=(0.9821918433556398, -0.18788076763109685, 0), z_dir=(0, 0, -1))) as fillet2_piece_17:
        with BuildLine():
            CenterArc((2.626459909, -3.168565402), FILLET2_R, 93.648378202, 75.522487814)
            Line((-0.491999193, -2.572043965), (0, 0))
            ThreePointArc((0, 0), (1.212212266, -0.038607589), (2.424424532, 0))
        make_face()
    extrude(amount=6.35)
    with BuildSketch(Plane(origin=(2.38125, -15.695390197, 6.35), x_dir=(0.9751789458520725, 0.22141820965503414, 0), z_dir=(0, 0, -1))) as fillet2_piece_18:
        with BuildLine():
            CenterArc((2.536820731, 3.166613236), FILLET2_R, 192.792344929, 73.0422367)
            Line((-0.559372422, 2.46361042), (0, 0))
            ThreePointArc((0, 0), (1.153100332, 0.041933821), (2.306200665, 0))
        make_face()
    extrude(amount=6.35)
    with BuildSketch(Plane(origin=(-29.62504423, 15.608347432, 6.35), x_dir=(0.9718852801043993, -0.23545488382361762, 0), z_dir=(0, 0, -1))) as fillet2_piece_19:
        with BuildLine():
            CenterArc((2.162667805, 3.16732145), FILLET2_R, 208.368546977, 57.645860045)
            ThreePointArc((-0.63104498, 1.658747992), (-0.260871655, 0.85016506), (0, 0))
            ThreePointArc((0, 0), (0.970993708, 0.033785621), (1.941987416, 0))
        make_face()
    extrude(amount=6.35)
    with BuildSketch(Plane(origin=(-12.084223595, 33.149168066, 6.35), x_dir=(0.8246499702941673, 0.5656433739502559, 0), z_dir=(0, 0, -1))) as fillet2_piece_20:
        with BuildLine():
            CenterArc((2.191347329, 3.147547312), FILLET2_R, 204.81413513, 57.645860045)
            ThreePointArc((-0.690517526, 1.815075941), (-0.313681078, 0.919551212), (0, 0))
            ThreePointArc((0, 0), (0.88736445, 0.058472063), (1.7747289, 0))
        make_face()
    extrude(amount=6.35)
    with BuildSketch(Plane(origin=(11.382620871, 44.799123836, 6.35), x_dir=(-1, 0, 0), z_dir=(0, 0, -1))) as fillet2_piece_21:
        with BuildLine():
            CenterArc((5.870211946, -3.175), FILLET2_R, 90, 104.24047737)
            ThreePointArc((2.792773958, -3.956025242), (1.762630657, -1.719461236), (0, 0))
            Line((0, 0), (5.870211946, 0))
        make_face()
    extrude(amount=6.35)
    with BuildSketch(Plane(origin=(12.084223595, 33.149168066, 6.35), x_dir=(-0.8246499702942053, 0.5656433739502005, 0), z_dir=(0, 0, -1))) as fillet2_piece_22:
        with BuildLine():
            CenterArc((2.191347329, -3.147547312), FILLET2_R, 97.540004825, 57.645860045)
            ThreePointArc((-0.690517526, -1.815075941), (-0.313681078, -0.919551212), (0, 0))
            ThreePointArc((0, 0), (0.88736445, -0.058472063), (1.7747289, 0))
        make_face()
    extrude(amount=6.35)
    with BuildSketch(Plane(origin=(-11.382620871, 44.799123836, 6.35), x_dir=(0.5767225543073922, -0.8169400806382051, 0), z_dir=(0, 0, -1))) as fillet2_piece_23:
        with BuildLine():
            CenterArc((5.979268384, -2.964517311), FILLET2_R, 110.979875819, 104.24047737)
            Line((3.385483628, -4.795611421), (0, 0))
            ThreePointArc((0, 0), (2.421245656, -0.448311554), (4.842491311, 0))
        make_face()
    extrude(amount=6.35)
    with BuildSketch(Plane(origin=(30.763558685, -28.503099379, 6.35), x_dir=(-0.8624478196439587, 0.5061459852566073, 0), z_dir=(0, 0, -1))) as fillet2_piece_24:
        with BuildLine():
            CenterArc((2.241873995, -3.149732386), FILLET2_R, 97.233297448, 62.999700492)
            Line((-0.746041351, -2.075960119), (0, 0))
            ThreePointArc((0, 0), (0.921055222, -0.058216583), (1.842110444, 0))
        make_face()
    extrude(amount=6.35)
    with BuildSketch(Plane(origin=(27.471099817, -46.02775829, 6.35), x_dir=(0.18464529349029338, 0.9828052276986948, 0), z_dir=(0, 0, -1))) as fillet2_piece_25:
        with BuildLine():
            CenterArc((2.871216617, -3.175), FILLET2_R, 90, 76.895975379)
            ThreePointArc((-0.221106524, -2.455164883), (-0.02516467, -1.235272343), (0, 0))
            Line((0, 0), (2.871216617, 0))
        make_face()
    extrude(amount=6.35)
    with BuildSketch(Plane(origin=(-8.904792953, -13.142309061, 6.35), x_dir=(-0.785364270252568, 0.6190338948802813, 0), z_dir=(0, 0, -1))) as fillet2_piece_26:
        with BuildLine():
            CenterArc((2.512462802, -3.166773726), FILLET2_R, 94.125353451, 72.542396876)
            Line((-0.57696851, -2.434626768), (0, 0))
            ThreePointArc((0, 0), (1.142028546, -0.04113137), (2.284057092, 0))
        make_face()
    extrude(amount=6.35)
    with BuildSketch(Plane(origin=(-24.813855531, -47.39452079, 6.35), x_dir=(0.42124744464143826, 0.906945748313017, 0), z_dir=(0, 0, -1))) as fillet2_piece_27:
        with BuildLine():
            CenterArc((1.936695488, -3.175), FILLET2_R, 90, 56.989399658)
            ThreePointArc((-0.725763594, -1.44527845), (-0.322818127, -0.742757669), (0, 0))
            Line((0, 0), (1.936695488, 0))
        make_face()
    extrude(amount=6.35)
    with BuildSketch(Plane(origin=(-4.297508552, -15.28224608, 6.35), x_dir=(-0.42124744464138836, -0.9069457483130401, 0), z_dir=(0, 0, -1))) as fillet2_piece_28:
        with BuildLine():
            CenterArc((2.502059184, -3.175), FILLET2_R, 90, 72.542396876)
            ThreePointArc((-0.52669778, -2.2225), (-0.223326042, -1.12073479), (0, 0))
            Line((0, 0), (2.502059184, 0))
        make_face()
    extrude(amount=6.35)
    with BuildSketch(Plane(origin=(16.064762788, -40.240287564, 6.35), x_dir=(-0.4212474446414388, 0.9069457483130168, 0), z_dir=(0, 0, -1)), Plane(origin=(-15.854365092, -40.164158211, 6.35), x_dir=(0.9403361086432114, 0.3402469732146674, 0), z_dir=(0, 0, -1))) as fillet2_piece_29:
        with BuildLine():
            CenterArc((FILLET2_R * 2.40265836652, -FILLET2_R), FILLET2_R, 90, 134.805290683)
            Line((FILLET2_R * 1.69315269881, -FILLET2_R * 1.7046997286), (0, 0))
            Line((0, 0), (FILLET2_R * 2.40265836652, 0))
        make_face()
    extrude(amount=6.35)


solid = part.part
